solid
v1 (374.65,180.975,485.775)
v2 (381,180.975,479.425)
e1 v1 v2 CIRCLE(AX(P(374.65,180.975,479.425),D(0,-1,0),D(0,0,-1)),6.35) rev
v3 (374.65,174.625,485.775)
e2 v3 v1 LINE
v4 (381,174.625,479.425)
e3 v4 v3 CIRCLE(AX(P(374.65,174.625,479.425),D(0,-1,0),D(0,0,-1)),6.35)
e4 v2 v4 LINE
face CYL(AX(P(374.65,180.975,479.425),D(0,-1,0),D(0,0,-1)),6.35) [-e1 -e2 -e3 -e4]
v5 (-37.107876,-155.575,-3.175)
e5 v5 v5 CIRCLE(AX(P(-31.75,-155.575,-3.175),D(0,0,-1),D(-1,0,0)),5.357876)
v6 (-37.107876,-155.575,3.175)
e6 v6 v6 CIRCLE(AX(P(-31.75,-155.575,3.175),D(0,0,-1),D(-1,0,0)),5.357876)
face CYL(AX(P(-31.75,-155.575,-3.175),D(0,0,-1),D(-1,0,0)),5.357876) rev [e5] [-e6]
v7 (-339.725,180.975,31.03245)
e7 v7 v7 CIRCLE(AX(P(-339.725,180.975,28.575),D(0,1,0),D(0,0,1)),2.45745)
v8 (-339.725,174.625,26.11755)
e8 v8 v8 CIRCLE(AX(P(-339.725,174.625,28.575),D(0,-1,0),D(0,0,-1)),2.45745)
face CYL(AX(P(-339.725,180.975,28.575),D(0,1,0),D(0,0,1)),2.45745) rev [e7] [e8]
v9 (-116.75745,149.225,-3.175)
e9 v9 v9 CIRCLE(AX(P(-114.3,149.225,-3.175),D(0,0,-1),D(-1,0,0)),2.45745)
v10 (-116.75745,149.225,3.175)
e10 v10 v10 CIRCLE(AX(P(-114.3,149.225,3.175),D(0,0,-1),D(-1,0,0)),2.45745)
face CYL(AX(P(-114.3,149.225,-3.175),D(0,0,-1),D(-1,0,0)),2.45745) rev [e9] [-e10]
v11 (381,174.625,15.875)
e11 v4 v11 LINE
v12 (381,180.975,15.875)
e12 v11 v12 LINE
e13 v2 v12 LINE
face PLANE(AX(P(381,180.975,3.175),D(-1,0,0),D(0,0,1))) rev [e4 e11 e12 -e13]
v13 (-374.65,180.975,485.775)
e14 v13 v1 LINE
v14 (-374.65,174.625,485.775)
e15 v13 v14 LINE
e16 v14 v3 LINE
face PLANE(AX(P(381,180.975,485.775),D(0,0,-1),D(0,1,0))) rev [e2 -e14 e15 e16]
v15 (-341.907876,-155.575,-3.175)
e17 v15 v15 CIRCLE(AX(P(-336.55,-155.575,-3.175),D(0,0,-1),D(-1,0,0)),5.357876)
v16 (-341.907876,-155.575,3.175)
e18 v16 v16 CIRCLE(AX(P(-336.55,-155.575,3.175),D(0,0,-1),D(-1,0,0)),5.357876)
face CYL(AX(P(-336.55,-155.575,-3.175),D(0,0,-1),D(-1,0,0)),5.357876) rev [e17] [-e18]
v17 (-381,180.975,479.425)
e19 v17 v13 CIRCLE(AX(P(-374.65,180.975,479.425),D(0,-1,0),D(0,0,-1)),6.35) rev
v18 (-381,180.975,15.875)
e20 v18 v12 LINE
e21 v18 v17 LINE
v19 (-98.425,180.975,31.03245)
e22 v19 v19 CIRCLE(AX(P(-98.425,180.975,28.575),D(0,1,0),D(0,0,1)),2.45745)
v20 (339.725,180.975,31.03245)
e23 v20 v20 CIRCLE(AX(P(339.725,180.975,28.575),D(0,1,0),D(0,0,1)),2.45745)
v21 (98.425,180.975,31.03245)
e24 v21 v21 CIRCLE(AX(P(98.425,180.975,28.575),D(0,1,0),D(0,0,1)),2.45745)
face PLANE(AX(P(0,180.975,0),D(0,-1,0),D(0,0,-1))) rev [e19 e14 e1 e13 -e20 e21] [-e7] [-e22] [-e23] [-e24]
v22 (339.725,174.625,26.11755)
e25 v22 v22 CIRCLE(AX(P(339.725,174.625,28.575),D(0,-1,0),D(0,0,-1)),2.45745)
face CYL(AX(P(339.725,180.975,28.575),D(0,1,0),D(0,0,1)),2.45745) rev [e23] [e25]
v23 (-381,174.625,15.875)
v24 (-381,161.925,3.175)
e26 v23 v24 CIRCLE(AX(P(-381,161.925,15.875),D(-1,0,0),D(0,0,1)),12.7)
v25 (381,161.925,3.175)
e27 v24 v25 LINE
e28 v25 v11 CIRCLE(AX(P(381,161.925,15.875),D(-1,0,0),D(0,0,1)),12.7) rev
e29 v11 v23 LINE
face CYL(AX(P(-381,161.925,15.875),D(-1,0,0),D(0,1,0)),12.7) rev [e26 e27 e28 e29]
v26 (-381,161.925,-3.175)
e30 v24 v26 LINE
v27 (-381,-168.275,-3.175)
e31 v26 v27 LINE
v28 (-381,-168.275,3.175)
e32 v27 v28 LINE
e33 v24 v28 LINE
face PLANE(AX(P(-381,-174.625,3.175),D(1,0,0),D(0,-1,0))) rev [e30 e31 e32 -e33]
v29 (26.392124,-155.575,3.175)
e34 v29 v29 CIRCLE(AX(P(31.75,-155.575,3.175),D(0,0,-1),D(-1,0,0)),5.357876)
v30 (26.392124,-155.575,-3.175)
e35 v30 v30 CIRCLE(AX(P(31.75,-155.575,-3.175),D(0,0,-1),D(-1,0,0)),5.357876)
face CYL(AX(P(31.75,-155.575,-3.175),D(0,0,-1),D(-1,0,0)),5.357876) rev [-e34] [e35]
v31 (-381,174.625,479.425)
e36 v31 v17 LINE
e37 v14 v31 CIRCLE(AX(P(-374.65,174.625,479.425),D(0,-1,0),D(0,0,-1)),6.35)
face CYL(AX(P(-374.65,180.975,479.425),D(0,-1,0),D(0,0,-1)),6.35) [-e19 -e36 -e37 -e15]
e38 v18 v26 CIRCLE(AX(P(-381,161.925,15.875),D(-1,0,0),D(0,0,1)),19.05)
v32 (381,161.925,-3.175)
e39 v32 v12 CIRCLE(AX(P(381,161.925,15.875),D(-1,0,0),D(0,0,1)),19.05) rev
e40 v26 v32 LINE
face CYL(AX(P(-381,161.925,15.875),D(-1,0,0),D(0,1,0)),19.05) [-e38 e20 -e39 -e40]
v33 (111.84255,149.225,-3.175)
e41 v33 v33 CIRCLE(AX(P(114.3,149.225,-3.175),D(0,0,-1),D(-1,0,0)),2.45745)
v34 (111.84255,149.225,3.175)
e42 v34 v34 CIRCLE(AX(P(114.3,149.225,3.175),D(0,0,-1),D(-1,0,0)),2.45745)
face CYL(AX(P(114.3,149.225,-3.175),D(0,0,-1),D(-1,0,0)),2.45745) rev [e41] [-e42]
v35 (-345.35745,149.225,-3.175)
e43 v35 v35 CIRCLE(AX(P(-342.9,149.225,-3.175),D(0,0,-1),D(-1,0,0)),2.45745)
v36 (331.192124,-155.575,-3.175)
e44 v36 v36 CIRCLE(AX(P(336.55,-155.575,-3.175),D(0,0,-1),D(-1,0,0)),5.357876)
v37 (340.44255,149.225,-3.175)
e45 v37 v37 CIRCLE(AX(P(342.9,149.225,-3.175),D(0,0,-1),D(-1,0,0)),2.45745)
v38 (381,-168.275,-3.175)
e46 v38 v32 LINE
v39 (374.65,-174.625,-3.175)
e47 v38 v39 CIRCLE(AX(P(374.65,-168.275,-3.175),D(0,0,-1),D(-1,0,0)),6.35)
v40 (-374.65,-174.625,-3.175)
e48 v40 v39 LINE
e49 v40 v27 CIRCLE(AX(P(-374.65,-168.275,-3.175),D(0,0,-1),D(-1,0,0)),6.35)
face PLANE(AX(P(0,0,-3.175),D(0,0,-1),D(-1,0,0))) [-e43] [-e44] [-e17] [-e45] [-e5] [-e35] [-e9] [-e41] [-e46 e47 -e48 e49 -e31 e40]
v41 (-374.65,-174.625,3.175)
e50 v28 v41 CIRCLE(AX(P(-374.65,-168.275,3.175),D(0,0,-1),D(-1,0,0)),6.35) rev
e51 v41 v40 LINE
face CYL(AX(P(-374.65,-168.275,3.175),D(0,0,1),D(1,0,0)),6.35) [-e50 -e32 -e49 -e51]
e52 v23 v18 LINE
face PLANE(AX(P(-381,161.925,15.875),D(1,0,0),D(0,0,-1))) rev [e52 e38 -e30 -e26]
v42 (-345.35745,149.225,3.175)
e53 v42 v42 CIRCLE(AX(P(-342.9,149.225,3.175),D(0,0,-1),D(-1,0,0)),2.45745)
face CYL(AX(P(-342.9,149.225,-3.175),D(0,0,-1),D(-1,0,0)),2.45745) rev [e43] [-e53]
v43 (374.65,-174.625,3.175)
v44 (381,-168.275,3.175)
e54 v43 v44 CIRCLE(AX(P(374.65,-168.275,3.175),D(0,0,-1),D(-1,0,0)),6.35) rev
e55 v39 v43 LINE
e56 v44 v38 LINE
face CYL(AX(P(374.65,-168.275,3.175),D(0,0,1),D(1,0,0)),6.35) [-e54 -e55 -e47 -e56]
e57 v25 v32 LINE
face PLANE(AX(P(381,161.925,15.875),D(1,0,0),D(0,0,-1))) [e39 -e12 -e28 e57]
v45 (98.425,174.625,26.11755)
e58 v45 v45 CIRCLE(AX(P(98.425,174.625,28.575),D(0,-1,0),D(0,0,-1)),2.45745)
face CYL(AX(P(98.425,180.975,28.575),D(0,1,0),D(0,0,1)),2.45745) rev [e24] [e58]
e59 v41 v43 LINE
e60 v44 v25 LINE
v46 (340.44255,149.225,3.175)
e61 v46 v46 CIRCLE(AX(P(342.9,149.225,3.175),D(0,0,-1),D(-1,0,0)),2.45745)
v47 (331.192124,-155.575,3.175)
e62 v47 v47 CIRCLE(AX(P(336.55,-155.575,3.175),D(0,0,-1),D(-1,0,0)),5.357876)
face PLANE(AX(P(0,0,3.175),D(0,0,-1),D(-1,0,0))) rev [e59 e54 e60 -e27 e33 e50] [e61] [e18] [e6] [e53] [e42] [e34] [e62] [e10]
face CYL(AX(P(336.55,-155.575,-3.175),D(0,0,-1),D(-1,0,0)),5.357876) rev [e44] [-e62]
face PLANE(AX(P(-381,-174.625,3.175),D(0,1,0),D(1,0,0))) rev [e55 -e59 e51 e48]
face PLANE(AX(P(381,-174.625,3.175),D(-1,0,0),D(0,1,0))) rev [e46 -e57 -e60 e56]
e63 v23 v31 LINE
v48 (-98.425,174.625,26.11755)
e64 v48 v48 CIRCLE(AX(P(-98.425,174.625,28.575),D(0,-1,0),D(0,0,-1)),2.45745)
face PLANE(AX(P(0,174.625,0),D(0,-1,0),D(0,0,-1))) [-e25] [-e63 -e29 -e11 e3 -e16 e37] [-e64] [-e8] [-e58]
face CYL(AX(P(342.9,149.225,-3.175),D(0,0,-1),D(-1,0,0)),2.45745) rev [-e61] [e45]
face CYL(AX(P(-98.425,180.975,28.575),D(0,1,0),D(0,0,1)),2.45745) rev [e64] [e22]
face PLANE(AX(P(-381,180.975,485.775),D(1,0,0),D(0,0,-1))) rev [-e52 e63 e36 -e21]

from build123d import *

# Parameters (mm, degrees)
SKETCH1_W                        = 762
SKETCH1_H                        = 349.25
BOSS_EXTRUDE1_DEPTH              = 3.175
EDGE_FLANGE1_STRIP_W             = 50.8
EDGE_FLANGE1_STRIP_H             = 6.35
EDGE_FLANGE1_STRIP_CUT_DEPTH     = 762
EDGE_FLANGE1_DEPTH               = 762
F_27_64_0_42188_DIAMETER_HOLE1_D = 10.715752
F_10_0_1935_DIAMETER_HOLE1_D     = 4.9149
F_10_0_1935_DIAMETER_HOLE2_D     = 4.9149
FILLET1_R                        = 6.35


# Sheet-metal steps are written as plain solids
with BuildPart() as part:
    # Sketch1 → Boss-Extrude1 (new, symmetric)
    with BuildSketch(Plane.XY):
        Rectangle(SKETCH1_W, SKETCH1_H)
    extrude(amount=BOSS_EXTRUDE1_DEPTH, both=True)

    # Edge-Flange1 strip (across the edge) → Edge-Flange1 strip cut (cut)
    with BuildSketch(Plane(origin=(381, 174.625, 3.175), x_dir=(0, -1, 0), z_dir=(-1, 0, 0))):
        with Locations((-12.7, -3.175)):
            Rectangle(EDGE_FLANGE1_STRIP_W, EDGE_FLANGE1_STRIP_H)
    extrude(amount=EDGE_FLANGE1_STRIP_CUT_DEPTH, mode=Mode.SUBTRACT)

    # Edge-Flange1 section (across the edge) → Edge-Flange1 (add)
    with BuildSketch(Plane(origin=(381, 174.625, 3.175), x_dir=(0, -1, 0), z_dir=(-1, 0, 0))):
        with BuildLine():
            Line((-6.35, 12.7), (-6.35, 482.6))
            Line((-6.35, 482.6), (0, 482.6))
            Line((0, 482.6), (0, 12.7))
            ThreePointArc((0, 12.7), (3.719743879, 3.719743879), (12.7, 0))
            Line((12.7, 0), (12.7, -6.35))
            ThreePointArc((12.7, -6.35), (-0.770384182, -0.770384182), (-6.35, 12.7))
        make_face()
    extrude(amount=EDGE_FLANGE1_DEPTH)

    # 27/64 (0.42188) Diameter Hole1 (through all)
    with Locations(Plane(origin=(0, 0, -3.175), x_dir=(-1, 0, 0), z_dir=(0, 0, -1))):
        with Locations((-31.75, -155.575), (336.55, -155.575), (31.75, -155.575), (-336.55, -155.575)):
            Hole(F_27_64_0_42188_DIAMETER_HOLE1_D / 2)

    # #10 (0.1935) Diameter Hole1 (through all)
    with Locations(Plane(origin=(0, 0, -3.175), x_dir=(-1, 0, 0), z_dir=(0, 0, -1))):
        with Locations((-342.9, 149.225), (-114.3, 149.225), (114.3, 149.225), (342.9, 149.225)):
            Hole(F_10_0_1935_DIAMETER_HOLE1_D / 2)

    # #10 (0.1935) Diameter Hole2 (through all)
    with Locations(Plane(origin=(0, 180.975, 0), x_dir=(1, 0, 0), z_dir=(0, 1, 0))):
        with Locations((-339.725, -28.575), (-98.425, -28.575), (98.425, -28.575), (339.725, -28.575)):
            Hole(F_10_0_1935_DIAMETER_HOLE2_D / 2)

    # Fillet1
    fillet1_edges = [part.edges().sort_by_distance(p)[0] for p in [
        (381, 177.8, 485.775),
        (-381, 177.8, 485.775),
        (381, -174.625, 0),
        (-381, -174.625, 0),
    ]]
    fillet(fillet1_edges, radius=FILLET1_R)


solid = part.part
